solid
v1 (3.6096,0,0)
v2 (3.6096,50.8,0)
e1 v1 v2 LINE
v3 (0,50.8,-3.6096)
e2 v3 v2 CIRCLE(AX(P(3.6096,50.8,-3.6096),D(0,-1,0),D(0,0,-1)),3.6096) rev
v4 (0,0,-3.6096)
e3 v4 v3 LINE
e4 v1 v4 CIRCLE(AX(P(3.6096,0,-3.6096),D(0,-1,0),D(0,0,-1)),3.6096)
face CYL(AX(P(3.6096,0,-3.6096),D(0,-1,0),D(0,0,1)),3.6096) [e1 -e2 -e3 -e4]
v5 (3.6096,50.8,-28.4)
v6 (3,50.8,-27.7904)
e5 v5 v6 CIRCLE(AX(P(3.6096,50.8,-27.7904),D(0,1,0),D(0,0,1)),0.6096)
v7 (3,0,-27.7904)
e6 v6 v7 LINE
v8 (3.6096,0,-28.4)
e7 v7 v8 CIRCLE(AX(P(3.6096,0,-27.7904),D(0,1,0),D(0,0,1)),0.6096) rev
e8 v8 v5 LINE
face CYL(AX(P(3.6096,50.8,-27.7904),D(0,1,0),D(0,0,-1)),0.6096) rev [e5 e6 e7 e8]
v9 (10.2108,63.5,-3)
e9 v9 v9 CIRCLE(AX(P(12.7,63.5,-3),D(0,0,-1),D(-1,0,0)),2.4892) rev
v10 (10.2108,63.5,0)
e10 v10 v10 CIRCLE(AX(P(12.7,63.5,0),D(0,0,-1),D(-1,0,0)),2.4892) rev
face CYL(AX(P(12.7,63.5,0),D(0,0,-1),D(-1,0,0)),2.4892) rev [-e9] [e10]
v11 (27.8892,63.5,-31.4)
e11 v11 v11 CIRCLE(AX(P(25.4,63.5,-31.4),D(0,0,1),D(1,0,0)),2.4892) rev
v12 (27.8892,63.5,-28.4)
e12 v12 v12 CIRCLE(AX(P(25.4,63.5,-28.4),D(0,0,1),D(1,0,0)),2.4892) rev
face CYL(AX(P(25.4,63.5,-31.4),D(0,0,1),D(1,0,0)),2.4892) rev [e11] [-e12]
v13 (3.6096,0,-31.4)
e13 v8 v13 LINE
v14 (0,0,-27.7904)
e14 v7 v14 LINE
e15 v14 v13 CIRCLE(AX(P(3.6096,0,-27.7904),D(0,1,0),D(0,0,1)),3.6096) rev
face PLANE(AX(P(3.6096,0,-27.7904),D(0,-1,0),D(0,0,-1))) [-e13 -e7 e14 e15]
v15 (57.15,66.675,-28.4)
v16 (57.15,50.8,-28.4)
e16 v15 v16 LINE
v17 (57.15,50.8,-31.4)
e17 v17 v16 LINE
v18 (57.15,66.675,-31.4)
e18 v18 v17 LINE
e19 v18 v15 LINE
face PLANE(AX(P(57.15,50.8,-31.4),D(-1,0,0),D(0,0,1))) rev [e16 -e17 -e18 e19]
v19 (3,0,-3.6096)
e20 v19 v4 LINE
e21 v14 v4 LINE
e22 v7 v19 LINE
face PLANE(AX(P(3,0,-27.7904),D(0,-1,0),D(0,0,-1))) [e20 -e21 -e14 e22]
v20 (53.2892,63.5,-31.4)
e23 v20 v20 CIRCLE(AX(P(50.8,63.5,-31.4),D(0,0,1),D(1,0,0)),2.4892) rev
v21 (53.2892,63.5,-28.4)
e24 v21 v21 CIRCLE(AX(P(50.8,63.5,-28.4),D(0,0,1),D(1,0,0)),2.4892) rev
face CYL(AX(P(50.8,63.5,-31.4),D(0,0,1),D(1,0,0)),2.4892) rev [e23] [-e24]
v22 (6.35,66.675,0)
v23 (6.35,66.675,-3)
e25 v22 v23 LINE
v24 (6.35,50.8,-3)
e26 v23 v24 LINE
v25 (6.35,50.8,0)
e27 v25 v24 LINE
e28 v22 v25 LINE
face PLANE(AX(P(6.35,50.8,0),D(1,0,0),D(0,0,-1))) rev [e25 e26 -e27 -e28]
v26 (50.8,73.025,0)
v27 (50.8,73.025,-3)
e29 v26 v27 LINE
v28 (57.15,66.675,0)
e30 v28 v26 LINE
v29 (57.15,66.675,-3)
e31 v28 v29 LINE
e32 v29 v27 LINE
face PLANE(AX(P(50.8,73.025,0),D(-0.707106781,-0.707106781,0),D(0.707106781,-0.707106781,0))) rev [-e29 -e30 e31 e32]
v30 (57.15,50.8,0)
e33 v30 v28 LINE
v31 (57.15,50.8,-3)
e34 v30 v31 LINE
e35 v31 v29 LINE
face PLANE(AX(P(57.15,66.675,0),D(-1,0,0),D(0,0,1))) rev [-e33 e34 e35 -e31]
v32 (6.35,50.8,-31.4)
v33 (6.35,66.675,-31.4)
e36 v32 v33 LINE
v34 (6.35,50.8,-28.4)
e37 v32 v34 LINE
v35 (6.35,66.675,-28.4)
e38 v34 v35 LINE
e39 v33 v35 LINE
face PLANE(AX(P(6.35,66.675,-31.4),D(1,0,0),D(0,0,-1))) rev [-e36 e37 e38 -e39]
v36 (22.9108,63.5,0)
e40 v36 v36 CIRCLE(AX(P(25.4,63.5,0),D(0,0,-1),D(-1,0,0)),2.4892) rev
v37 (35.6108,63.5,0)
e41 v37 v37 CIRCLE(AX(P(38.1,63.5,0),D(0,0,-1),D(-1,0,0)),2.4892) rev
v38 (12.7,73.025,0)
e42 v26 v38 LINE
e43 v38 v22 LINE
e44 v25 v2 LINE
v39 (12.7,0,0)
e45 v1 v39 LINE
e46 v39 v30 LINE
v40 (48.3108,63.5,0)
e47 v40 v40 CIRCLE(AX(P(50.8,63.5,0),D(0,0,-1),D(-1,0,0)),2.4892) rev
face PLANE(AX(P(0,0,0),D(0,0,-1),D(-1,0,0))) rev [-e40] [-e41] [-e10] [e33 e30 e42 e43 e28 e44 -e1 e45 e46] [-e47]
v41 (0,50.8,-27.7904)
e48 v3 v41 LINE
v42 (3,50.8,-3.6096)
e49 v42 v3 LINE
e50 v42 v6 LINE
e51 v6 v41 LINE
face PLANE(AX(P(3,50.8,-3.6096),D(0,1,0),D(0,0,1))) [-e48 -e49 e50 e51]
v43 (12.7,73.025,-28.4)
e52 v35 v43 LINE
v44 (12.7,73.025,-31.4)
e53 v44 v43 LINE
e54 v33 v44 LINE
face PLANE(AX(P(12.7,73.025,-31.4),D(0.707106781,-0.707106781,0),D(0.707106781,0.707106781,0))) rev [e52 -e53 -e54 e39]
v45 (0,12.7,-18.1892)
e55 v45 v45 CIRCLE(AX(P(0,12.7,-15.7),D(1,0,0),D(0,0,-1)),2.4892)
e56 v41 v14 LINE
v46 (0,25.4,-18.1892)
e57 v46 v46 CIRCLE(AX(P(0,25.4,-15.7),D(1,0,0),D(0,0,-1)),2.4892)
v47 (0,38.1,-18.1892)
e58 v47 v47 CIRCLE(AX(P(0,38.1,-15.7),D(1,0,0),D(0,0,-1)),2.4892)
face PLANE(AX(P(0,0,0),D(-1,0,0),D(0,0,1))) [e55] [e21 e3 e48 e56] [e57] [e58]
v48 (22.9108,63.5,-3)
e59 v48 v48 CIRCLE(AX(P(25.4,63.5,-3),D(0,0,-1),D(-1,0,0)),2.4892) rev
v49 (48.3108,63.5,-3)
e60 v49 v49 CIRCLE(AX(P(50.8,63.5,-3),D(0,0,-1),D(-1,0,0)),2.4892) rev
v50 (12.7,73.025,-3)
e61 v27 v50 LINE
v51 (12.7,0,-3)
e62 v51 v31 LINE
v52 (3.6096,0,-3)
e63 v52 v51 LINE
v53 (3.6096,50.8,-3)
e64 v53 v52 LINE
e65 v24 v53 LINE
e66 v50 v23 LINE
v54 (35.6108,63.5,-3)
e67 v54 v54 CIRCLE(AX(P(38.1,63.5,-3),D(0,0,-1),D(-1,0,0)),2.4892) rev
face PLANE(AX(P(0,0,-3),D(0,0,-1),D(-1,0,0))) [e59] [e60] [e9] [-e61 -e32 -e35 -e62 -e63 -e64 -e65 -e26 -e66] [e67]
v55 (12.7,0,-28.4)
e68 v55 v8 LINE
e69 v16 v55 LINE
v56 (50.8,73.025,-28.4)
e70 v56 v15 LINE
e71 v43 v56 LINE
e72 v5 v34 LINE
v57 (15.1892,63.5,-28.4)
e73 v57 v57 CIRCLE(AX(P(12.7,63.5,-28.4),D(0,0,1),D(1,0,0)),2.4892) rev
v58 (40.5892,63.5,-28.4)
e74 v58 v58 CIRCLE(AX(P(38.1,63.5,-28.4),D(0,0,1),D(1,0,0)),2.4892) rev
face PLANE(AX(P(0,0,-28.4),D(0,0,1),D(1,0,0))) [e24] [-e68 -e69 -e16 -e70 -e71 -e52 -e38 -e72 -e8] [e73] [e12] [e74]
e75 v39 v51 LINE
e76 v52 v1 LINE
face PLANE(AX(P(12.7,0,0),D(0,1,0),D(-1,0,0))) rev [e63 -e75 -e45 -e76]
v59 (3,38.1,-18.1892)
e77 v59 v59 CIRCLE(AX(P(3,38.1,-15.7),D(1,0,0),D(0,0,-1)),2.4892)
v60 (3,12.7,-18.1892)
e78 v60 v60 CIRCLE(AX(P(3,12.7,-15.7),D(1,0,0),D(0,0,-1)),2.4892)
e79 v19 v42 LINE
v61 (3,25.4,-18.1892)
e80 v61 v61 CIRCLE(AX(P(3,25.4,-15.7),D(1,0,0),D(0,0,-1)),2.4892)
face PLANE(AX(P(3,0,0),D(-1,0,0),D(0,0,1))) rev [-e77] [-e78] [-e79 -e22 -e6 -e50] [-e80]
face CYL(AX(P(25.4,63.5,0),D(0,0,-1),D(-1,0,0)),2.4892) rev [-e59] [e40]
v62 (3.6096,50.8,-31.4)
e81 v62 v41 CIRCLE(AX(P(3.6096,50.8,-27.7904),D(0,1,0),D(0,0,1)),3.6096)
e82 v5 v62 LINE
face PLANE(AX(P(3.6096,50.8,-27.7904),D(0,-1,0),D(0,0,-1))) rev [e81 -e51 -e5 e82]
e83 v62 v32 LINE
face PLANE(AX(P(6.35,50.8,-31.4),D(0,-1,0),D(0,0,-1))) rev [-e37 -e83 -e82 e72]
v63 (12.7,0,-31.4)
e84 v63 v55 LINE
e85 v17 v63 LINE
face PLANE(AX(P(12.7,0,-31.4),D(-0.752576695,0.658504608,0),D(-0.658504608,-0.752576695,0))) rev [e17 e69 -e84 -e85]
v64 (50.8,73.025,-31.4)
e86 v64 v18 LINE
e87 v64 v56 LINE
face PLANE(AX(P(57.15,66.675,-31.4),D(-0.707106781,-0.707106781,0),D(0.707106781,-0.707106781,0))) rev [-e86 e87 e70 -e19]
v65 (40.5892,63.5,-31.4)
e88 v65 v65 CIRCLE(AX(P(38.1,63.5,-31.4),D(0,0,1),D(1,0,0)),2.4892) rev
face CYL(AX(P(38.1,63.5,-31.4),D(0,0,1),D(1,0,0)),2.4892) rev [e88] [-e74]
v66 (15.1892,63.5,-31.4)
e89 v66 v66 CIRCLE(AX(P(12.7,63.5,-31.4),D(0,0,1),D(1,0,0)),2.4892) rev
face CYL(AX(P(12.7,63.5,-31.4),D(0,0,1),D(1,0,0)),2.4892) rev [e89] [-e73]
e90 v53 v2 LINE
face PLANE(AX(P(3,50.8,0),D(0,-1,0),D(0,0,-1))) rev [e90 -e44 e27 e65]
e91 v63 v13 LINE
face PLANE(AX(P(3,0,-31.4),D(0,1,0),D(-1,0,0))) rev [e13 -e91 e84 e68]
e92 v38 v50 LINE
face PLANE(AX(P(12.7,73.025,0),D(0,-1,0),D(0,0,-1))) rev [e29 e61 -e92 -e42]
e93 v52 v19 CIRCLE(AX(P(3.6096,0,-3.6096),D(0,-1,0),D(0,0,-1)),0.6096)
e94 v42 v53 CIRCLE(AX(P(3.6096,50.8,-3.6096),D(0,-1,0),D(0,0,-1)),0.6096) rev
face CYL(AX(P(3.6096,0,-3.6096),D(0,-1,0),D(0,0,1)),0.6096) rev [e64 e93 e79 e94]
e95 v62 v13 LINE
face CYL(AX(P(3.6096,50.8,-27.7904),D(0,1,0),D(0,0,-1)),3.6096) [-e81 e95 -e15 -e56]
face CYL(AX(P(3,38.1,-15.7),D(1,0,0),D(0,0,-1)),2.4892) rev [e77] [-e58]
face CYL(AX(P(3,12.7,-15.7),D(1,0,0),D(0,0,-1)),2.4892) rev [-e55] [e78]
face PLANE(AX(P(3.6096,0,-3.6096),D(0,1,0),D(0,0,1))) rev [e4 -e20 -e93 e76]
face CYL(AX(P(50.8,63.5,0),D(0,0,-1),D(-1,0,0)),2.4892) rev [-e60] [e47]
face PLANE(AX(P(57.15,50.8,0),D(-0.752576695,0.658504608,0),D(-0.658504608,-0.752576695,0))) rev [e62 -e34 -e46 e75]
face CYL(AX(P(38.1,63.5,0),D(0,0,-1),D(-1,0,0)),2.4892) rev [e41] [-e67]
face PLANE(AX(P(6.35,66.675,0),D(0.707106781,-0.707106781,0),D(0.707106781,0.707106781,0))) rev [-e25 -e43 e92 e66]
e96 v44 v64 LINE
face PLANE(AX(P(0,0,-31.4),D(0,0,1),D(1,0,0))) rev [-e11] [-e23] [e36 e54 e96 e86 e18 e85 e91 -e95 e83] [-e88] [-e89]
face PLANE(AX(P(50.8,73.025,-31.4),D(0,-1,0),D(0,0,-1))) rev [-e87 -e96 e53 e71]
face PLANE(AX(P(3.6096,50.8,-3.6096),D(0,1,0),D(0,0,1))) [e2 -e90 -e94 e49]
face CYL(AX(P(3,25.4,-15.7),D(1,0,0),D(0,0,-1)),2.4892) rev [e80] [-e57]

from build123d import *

# Parameters (mm, degrees)
SKETCH7_W                  = 50.8
SKETCH7_H                  = 24.1808
BASE_FLANGE1_DEPTH         = 3
F_9_0_196_DIAMETER_HOLE1_D = 4.9784
EDGE_FLANGE1_DEPTH         = 50.8
EDGE_FLANGE1_START         = 3
EDGE_FLANGE1_PROFILE_R     = 2.4892
EDGE_FLANGE1_FLAT_DEPTH    = 3
EDGE_FLANGE2_DEPTH         = 50.8
EDGE_FLANGE2_START         = 3
EDGE_FLANGE2_PROFILE_R     = 2.4892
EDGE_FLANGE2_FLAT_DEPTH    = 3


# Sheet-metal steps are written as plain solids
with BuildPart() as part:
    # Sketch7 → Base-Flange1 (new body)
    with BuildSketch(Plane(origin=(0, 0, 0), x_dir=(0, -1, 0), z_dir=(-1, 0, 0))):
        with Locations((-25.4, -15.7)):
            Rectangle(SKETCH7_W, SKETCH7_H)
    extrude(amount=-BASE_FLANGE1_DEPTH)

    # #9 (0.196) Diameter Hole1 (through all)
    with Locations(Plane(origin=(3, 0, 0), x_dir=(0, 0, -1), z_dir=(1, 0, 0))):
        with Locations((15.7, 25.4), (15.7, 12.7), (15.7, 38.1)):
            Hole(F_9_0_196_DIAMETER_HOLE1_D / 2)

    # Edge-Flange1 bend section (across the edge) → Edge-Flange1 (add)
    with BuildSketch(Plane(origin=(3, 0, -28.4), x_dir=(0, 0, 1), z_dir=(0, 1, 0))):
        with BuildLine():
            Line((-3, 0.6096), (0, 0.6096))
            ThreePointArc((0, 0.6096), (0.178547706, 0.178547706), (0.6096, 0))
            Line((0.6096, 0), (0.6096, -3))
            ThreePointArc((0.6096, -3), (-1.942772637, -1.942772637), (-3, 0.6096))
        make_face()
    extrude(amount=EDGE_FLANGE1_DEPTH)

    # Edge-Flange1 profile (on flange) → Edge-Flange1 flat (add)
    with BuildSketch(Plane(origin=(3, 0, -28.4), x_dir=(0, 1, 0), z_dir=(0, 0, -1)).offset(EDGE_FLANGE1_START)):
        Polygon((0, 0.6096), (50.8, 0.6096), (50.8, 3.35), (66.675, 3.35), (73.025, 9.7), (73.025, 47.8), (66.675, 54.15), (50.8, 54.15), (0, 9.7), align=None)
        with Locations((63.5, 9.7)):
            Circle(EDGE_FLANGE1_PROFILE_R, mode=Mode.SUBTRACT)
        with Locations((63.5, 22.4)):
            Circle(EDGE_FLANGE1_PROFILE_R, mode=Mode.SUBTRACT)
        with Locations((63.5, 35.1)):
            Circle(EDGE_FLANGE1_PROFILE_R, mode=Mode.SUBTRACT)
        with Locations((63.5, 47.8)):
            Circle(EDGE_FLANGE1_PROFILE_R, mode=Mode.SUBTRACT)
    extrude(amount=-EDGE_FLANGE1_FLAT_DEPTH)

    # Edge-Flange2 bend section (across the edge) → Edge-Flange2 (add)
    with BuildSketch(Plane(origin=(3, 50.8, -3), x_dir=(0, 0, -1), z_dir=(0, -1, 0))):
        with BuildLine():
            Line((-3, 0.6096), (0, 0.6096))
            ThreePointArc((0, 0.6096), (0.178547706, 0.178547706), (0.6096, 0))
            Line((0.6096, 0), (0.6096, -3))
            ThreePointArc((0.6096, -3), (-1.942772637, -1.942772637), (-3, 0.6096))
        make_face()
    extrude(amount=EDGE_FLANGE2_DEPTH)

    # Edge-Flange2 profile (on flange) → Edge-Flange2 flat (add)
    with BuildSketch(Plane(origin=(3, 0, -3), x_dir=(0, -1, 0), z_dir=(0, 0, 1)).offset(EDGE_FLANGE2_START)):
        Polygon((0, 0.6096), (0, 9.7), (-50.8, 54.15), (-66.675, 54.15), (-73.025, 47.8), (-73.025, 9.7), (-66.675, 3.35), (-50.8, 3.35), (-50.8, 0.6096), align=None)
        with Locations((-63.5, 9.7)):
            Circle(EDGE_FLANGE2_PROFILE_R, mode=Mode.SUBTRACT)
        with Locations((-63.5, 22.4)):
            Circle(EDGE_FLANGE2_PROFILE_R, mode=Mode.SUBTRACT)
        with Locations((-63.5, 35.1)):
            Circle(EDGE_FLANGE2_PROFILE_R, mode=Mode.SUBTRACT)
        with Locations((-63.5, 47.8)):
            Circle(EDGE_FLANGE2_PROFILE_R, mode=Mode.SUBTRACT)
    extrude(amount=-EDGE_FLANGE2_FLAT_DEPTH)


solid = part.part
